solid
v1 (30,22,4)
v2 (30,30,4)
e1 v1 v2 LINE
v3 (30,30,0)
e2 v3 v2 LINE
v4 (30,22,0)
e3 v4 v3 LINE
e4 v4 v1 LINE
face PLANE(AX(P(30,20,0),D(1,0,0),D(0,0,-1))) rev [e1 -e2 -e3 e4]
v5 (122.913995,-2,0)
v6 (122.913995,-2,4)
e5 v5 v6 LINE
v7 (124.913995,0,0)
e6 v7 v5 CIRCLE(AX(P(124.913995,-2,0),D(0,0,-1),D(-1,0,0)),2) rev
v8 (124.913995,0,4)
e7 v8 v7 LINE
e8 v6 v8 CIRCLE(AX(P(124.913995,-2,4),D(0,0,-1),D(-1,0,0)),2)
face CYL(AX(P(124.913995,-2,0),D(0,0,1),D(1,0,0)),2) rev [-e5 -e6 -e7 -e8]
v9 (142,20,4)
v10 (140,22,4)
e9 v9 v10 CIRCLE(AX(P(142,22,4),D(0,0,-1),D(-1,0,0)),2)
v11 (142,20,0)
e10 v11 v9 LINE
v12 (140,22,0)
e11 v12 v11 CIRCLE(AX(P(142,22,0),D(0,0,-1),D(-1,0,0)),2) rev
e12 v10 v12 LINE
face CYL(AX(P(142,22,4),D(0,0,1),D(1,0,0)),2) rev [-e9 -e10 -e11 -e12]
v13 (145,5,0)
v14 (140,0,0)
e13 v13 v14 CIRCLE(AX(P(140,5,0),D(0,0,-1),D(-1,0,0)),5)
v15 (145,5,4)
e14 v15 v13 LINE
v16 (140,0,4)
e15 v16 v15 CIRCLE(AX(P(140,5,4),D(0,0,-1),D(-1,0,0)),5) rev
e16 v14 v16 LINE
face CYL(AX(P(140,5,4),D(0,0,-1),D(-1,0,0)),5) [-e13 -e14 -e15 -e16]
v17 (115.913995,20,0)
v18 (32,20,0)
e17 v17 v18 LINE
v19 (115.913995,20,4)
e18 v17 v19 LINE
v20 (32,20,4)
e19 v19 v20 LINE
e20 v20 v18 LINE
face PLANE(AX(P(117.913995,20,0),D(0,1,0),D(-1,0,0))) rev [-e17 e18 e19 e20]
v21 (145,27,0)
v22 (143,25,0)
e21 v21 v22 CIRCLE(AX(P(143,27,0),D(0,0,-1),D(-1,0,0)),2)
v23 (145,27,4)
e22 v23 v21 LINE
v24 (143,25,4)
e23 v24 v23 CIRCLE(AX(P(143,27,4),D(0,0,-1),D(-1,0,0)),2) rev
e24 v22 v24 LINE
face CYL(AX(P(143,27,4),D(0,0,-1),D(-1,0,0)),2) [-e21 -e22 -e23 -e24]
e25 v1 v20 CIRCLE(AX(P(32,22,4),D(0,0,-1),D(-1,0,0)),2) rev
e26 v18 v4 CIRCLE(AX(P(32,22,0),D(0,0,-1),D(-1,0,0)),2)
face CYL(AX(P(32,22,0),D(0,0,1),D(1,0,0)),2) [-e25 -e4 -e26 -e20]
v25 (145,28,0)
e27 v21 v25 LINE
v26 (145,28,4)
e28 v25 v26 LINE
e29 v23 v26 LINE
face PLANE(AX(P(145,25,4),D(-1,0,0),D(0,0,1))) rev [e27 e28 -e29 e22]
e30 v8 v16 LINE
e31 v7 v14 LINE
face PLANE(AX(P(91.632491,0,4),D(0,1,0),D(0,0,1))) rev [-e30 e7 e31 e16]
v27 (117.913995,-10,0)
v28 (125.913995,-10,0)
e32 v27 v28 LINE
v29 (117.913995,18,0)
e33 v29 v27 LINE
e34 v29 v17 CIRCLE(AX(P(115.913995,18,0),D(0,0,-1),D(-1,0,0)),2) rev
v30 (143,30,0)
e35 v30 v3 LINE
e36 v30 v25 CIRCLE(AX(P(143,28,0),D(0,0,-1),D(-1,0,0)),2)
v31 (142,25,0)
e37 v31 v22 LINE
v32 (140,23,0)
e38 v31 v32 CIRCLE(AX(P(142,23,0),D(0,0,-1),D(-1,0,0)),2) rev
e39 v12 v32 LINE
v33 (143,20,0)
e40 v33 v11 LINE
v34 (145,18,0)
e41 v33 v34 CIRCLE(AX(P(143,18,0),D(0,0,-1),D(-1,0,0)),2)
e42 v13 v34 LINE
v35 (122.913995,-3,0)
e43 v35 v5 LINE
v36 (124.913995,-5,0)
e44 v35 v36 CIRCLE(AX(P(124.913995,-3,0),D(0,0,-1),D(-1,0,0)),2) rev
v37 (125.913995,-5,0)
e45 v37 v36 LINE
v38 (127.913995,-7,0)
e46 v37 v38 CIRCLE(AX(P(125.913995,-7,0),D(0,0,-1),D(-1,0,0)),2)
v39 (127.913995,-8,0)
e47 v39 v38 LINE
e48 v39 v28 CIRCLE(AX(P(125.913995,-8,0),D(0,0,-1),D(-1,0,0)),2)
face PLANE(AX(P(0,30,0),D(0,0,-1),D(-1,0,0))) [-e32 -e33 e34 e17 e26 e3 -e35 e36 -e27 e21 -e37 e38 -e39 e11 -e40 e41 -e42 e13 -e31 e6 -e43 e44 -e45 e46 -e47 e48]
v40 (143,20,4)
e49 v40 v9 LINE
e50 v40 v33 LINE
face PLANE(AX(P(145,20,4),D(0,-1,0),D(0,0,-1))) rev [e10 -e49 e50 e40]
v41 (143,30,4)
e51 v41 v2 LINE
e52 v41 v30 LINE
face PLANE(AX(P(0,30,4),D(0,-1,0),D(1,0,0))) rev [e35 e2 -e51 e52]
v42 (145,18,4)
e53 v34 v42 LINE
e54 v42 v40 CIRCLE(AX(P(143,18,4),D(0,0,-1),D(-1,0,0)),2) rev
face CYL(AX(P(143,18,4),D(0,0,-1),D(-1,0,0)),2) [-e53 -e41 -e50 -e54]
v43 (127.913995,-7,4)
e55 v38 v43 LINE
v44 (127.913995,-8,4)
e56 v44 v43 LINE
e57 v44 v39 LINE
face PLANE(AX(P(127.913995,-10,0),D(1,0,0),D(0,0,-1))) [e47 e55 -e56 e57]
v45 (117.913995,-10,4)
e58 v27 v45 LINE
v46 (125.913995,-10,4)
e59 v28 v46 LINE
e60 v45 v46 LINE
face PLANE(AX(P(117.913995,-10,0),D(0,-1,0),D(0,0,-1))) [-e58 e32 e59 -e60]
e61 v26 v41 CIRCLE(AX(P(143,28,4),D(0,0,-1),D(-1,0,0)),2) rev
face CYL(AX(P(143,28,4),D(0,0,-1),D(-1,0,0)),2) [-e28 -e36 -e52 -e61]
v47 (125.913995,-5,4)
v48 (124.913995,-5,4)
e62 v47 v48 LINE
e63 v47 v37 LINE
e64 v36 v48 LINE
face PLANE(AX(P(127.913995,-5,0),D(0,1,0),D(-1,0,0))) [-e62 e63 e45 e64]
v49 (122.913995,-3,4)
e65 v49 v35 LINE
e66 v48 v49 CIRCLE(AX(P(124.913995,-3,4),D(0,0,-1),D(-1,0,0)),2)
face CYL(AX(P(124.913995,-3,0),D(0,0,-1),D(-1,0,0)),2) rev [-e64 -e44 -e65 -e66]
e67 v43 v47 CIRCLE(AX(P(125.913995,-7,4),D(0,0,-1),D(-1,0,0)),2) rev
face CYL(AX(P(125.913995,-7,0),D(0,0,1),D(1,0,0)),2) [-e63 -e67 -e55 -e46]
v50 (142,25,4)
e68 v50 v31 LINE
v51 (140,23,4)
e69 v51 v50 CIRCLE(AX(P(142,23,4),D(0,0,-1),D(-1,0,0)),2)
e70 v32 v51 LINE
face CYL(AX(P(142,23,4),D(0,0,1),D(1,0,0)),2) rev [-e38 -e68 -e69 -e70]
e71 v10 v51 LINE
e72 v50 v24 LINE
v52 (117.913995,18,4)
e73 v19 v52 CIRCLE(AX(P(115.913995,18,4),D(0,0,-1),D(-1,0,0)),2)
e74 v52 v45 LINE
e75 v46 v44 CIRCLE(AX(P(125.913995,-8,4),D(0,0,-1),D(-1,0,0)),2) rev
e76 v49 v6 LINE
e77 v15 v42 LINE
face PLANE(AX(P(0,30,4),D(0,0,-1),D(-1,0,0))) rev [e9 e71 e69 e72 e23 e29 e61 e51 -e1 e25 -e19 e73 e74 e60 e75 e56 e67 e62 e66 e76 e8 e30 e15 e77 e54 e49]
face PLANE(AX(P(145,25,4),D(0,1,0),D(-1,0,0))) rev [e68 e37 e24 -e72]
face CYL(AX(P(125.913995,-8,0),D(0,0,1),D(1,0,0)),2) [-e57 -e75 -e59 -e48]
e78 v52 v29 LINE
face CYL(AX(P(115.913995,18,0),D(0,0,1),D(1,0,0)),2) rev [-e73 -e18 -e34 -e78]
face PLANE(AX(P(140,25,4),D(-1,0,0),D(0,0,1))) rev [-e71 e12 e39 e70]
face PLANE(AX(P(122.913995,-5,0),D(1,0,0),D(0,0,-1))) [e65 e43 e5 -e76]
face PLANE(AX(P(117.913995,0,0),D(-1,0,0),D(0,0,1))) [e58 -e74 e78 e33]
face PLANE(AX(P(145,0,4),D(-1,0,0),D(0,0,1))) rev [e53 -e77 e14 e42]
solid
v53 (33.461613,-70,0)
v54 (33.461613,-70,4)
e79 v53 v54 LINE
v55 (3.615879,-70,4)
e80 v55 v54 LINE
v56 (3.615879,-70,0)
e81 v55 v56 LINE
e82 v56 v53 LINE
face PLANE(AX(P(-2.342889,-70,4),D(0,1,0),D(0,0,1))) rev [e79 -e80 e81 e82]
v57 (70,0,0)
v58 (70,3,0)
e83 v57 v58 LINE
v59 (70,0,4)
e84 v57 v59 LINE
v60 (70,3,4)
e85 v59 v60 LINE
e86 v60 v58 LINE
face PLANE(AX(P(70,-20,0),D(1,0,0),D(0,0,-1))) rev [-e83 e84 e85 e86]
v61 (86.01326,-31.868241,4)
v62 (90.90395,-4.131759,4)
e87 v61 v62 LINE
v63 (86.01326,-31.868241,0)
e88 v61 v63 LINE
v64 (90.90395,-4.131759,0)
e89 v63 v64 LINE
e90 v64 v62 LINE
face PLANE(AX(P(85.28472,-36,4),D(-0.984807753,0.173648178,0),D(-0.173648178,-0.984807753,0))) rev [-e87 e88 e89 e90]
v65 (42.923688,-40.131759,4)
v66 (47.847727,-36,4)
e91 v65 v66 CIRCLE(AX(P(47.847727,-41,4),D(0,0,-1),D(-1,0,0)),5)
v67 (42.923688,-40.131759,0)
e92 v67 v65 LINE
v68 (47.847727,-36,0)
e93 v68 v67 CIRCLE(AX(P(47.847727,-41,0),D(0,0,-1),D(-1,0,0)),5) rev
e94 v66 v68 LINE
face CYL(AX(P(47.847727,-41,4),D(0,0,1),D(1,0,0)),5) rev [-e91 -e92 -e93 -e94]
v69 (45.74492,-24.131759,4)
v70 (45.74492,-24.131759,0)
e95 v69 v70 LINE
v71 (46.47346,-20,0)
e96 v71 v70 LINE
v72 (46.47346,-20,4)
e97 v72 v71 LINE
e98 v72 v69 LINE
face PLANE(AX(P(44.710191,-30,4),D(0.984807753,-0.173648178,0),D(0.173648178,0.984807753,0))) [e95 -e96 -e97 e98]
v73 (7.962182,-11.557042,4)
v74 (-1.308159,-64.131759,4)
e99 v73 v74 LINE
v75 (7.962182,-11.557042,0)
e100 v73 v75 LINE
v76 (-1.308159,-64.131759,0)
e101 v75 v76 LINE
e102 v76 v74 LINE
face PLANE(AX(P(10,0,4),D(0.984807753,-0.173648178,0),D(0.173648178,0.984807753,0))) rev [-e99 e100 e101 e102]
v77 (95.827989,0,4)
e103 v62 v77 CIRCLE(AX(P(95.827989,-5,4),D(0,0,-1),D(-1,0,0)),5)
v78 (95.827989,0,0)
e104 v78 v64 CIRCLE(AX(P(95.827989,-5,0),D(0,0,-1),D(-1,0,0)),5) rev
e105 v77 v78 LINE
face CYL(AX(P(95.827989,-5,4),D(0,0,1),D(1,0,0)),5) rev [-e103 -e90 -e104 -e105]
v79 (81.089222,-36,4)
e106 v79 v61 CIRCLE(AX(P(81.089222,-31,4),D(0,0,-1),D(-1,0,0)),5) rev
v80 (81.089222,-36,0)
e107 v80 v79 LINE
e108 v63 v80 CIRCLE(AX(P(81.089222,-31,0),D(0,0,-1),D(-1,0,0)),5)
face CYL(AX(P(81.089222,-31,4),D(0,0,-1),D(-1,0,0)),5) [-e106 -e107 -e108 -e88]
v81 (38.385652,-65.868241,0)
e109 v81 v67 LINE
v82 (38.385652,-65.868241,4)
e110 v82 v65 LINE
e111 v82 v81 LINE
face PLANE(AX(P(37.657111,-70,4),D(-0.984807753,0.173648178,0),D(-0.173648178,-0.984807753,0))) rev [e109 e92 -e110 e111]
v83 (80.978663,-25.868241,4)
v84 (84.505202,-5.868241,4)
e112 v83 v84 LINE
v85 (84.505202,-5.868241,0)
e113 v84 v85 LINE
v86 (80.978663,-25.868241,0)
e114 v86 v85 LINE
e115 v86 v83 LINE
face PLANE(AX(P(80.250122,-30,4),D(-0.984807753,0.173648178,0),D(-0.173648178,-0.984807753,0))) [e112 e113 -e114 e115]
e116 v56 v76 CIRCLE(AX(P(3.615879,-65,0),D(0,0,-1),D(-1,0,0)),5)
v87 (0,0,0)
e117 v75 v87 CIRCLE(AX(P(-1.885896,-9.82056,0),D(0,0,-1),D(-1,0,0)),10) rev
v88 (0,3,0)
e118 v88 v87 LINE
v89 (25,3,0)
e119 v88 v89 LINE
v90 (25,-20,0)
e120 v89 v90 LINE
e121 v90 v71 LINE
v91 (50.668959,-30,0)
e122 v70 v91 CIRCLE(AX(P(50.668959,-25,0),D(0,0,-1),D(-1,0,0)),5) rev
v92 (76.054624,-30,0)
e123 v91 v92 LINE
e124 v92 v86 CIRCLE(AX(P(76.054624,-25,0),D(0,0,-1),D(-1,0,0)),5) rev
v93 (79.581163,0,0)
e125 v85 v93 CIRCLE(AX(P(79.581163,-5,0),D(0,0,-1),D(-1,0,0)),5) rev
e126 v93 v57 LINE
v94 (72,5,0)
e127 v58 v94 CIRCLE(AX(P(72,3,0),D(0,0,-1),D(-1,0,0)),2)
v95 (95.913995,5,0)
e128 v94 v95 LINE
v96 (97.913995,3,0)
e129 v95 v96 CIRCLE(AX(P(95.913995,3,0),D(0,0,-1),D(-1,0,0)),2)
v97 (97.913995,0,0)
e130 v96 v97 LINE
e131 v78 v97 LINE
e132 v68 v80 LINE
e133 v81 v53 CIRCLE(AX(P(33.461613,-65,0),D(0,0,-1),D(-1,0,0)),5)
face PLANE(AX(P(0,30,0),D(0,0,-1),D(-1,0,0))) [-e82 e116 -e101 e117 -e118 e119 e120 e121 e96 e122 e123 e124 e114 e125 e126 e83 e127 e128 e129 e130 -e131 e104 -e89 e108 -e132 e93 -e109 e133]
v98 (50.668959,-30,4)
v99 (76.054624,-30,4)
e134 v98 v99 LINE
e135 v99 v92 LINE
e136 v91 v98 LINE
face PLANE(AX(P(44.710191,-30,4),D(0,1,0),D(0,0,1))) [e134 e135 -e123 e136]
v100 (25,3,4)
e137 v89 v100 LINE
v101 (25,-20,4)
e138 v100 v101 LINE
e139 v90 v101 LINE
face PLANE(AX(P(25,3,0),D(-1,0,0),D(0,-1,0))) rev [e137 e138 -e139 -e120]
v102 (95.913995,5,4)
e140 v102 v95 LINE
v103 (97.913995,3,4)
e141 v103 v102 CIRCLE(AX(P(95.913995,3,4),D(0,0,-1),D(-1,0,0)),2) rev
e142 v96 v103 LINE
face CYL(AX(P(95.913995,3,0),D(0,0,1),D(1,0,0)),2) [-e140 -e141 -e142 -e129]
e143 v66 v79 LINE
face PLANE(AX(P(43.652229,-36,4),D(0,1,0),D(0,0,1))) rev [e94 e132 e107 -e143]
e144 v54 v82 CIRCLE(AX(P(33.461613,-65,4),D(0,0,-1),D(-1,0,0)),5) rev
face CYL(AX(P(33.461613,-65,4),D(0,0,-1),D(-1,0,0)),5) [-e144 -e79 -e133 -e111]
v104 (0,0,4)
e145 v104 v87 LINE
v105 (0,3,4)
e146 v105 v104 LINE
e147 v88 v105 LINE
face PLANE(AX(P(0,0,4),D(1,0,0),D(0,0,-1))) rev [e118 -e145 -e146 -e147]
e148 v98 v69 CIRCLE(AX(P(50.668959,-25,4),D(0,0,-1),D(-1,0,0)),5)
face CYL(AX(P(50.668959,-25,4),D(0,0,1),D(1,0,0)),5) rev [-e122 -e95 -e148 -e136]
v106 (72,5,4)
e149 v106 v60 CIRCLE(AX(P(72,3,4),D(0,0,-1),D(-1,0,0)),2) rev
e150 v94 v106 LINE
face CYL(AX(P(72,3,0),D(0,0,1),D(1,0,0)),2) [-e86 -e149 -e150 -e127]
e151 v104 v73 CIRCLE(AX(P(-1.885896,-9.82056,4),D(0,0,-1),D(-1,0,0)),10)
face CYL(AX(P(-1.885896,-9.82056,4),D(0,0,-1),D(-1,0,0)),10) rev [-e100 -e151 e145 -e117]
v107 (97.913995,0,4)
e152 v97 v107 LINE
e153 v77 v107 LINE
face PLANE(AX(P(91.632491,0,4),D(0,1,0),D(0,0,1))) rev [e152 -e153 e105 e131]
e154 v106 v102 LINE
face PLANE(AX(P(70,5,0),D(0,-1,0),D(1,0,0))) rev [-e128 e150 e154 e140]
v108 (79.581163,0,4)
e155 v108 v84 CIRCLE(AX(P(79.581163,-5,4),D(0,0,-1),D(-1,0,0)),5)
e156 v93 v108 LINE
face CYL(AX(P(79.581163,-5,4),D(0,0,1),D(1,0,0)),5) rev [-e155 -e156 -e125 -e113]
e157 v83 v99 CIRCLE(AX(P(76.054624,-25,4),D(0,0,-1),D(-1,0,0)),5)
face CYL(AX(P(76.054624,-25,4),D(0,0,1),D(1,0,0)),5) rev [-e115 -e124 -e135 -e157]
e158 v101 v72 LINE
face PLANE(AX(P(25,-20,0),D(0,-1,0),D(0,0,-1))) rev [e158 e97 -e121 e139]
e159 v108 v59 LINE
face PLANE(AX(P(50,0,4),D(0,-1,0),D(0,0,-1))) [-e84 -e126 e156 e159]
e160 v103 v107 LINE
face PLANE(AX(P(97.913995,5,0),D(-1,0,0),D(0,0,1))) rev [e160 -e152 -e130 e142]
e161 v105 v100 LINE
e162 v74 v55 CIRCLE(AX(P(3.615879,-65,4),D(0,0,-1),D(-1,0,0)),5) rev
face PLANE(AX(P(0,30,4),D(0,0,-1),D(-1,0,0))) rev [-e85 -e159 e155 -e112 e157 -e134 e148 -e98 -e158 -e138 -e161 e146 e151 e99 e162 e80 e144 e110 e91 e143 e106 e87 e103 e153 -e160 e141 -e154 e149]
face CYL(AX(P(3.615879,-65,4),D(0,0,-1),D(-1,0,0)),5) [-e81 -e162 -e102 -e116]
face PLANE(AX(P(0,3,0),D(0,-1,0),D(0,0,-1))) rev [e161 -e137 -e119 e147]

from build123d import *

# Parameters (mm, degrees)
BOSS_EXTRUDE1_DEPTH = 4
FILLET1_R           = 10
FILLET2_R           = 5
CUT_EXTRUDE1_DEPTH  = 4
LPATTERN1_COUNT     = 6
LPATTERN1_PITCH     = 4
FILLET3_R           = 2
FILLET4_R           = 2
BOSS_EXTRUDE2_DEPTH = 4
FILLET5_R           = 2
CUT_EXTRUDE2_DEPTH  = 4
FILLET6_R           = 2
FILLET7_R           = 2
FILLET8_R           = 2
FILLET9_R           = 2


with BuildPart() as part:
    # Sketch1 → Boss-Extrude1 (new body)
    with BuildSketch(Plane.XY):
        Polygon((10, 0), (-2.34288865, -70), (37.65711135, -70), (43.652228694, -36), (85.284719782, -36), (91.632491087, 0), (145, 0), (145, 20), (140, 20), (140, 25), (145, 25), (145, 30), (0, 30), (0, 0), align=None)
        Polygon((44.710190579, -30), (80.250121995, -30), (85.539931416, 0), (50, 0), align=None, mode=Mode.SUBTRACT)
    extrude(amount=BOSS_EXTRUDE1_DEPTH)

    # Fillet1
    # the kernel refuses this fillet: 10 mm, written as the material it adds along each edge
    with BuildSketch(Plane(origin=(10, 0, 0), x_dir=(-0.17364817766693433, -0.9848077530122074, 0), z_dir=(0, 0, 1))) as fillet1_piece_1:
        with BuildLine():
            CenterArc((11.735327688, -10), FILLET1_R, 90, 89.129514879)
            Line((1.736481777, -9.84807753), (1.536504858, -9.845039081))
            ThreePointArc((1.536504858, -9.845039081), (0.671279338, -4.958768401), (-0.196961551, -0.034729636))
            Line((-0.196961551, -0.034729636), (0, 0.2))
            Line((0, 0.2), (11.735327688, 0.2))
            Line((11.735327688, 0.2), (11.735327688, 0))
        make_face()
    extrude(amount=4)

    # Fillet2
    fillet2_edges = [part.edges().sort_by_distance(p)[0] for p in [
        (145, 0, 2),
        (91.632491087, 0, 2),
        (85.284719782, -36, 2),
        (43.652228694, -36, 2),
        (37.65711135, -70, 2),
        (-2.34288865, -70, 2),
        (85.539931416, 0, 2),
        (50, 0, 2),
        (44.710190579, -30, 2),
        (80.250121995, -30, 2),
    ]]
    fillet(fillet2_edges, radius=FILLET2_R)

    # Sketch2 → Cut-Extrude1 (cut)
    with BuildSketch(Plane.XY.offset(4)):
        Polygon((0, 27), (4, 27), (0, 23), align=None)
    cut_extrude1 = extrude(amount=-CUT_EXTRUDE1_DEPTH, mode=Mode.SUBTRACT)

    # LPattern1: Cut-Extrude1 ×6
    with Locations(*[(0, -i * LPATTERN1_PITCH, 0) for i in range(1, LPATTERN1_COUNT)]):
        add(cut_extrude1, mode=Mode.SUBTRACT)

    # Fillet3
    fillet3_edges = [part.edges().sort_by_distance(p)[0] for p in [
        (145, 25, 2),
        (140, 25, 2),
        (140, 20, 2),
        (145, 20, 2),
    ]]
    fillet(fillet3_edges, radius=FILLET3_R)

    # Fillet4
    fillet4_edges = [part.edges().sort_by_distance(p)[0] for p in [
        (145, 30, 2),
    ]]
    fillet(fillet4_edges, radius=FILLET4_R)

    # Sketch3 → Boss-Extrude2 (add)
    with BuildSketch(Plane.XY.offset(4)):
        Polygon((117.913994622, 0), (117.913994622, -10), (127.913994622, -10), (127.913994622, -5), (122.913994622, -5), (122.913994622, 0), align=None)
    extrude(amount=-BOSS_EXTRUDE2_DEPTH)

    # Fillet5
    fillet5_edges = [part.edges().sort_by_distance(p)[0] for p in [
        (122.913994622, 0, 2),
        (122.913994622, -5, 2),
        (127.913994622, -5, 2),
        (127.913994622, -10, 2),
    ]]
    fillet(fillet5_edges, radius=FILLET5_R)

    # Sketch4 → Cut-Extrude2 (cut)
    with BuildSketch(Plane.XY.offset(4)):
        Polygon((117.913994622, 0), (117.913994622, 20), (30, 20), (30, 30), (0, 30), (0, 3), (25, 3), (25, -20), (70, -20), (70, 5), (97.913994622, 5), (97.913994622, 0), align=None)
    extrude(amount=-CUT_EXTRUDE2_DEPTH, mode=Mode.SUBTRACT)


with BuildPart() as cut_extrude2_piece_1:
    # of the separate pieces the step leaves, piece 1, a body of its own (cut_extrude2_pieces)
    add(part.part.solids().sort_by_distance((97.913994622, 5, 0))[0])

    # Fillet7
    fillet7_edges = [cut_extrude2_piece_1.edges().sort_by_distance(p)[0] for p in [
        (97.913994622, 5, 2),
    ]]
    fillet(fillet7_edges, radius=FILLET7_R)

    # Fillet9
    fillet9_edges = [cut_extrude2_piece_1.edges().sort_by_distance(p)[0] for p in [
        (70, 5, 2),
    ]]
    fillet(fillet9_edges, radius=FILLET9_R)


with BuildPart() as cut_extrude2_piece_2:
    # of the separate pieces the step leaves, piece 2, a body of its own (cut_extrude2_pieces)
    add(part.part.solids().sort_by_distance((124.913994622, 0, 0))[0])

    # Fillet6
    fillet6_edges = [cut_extrude2_piece_2.edges().sort_by_distance(p)[0] for p in [
        (117.913994622, 20, 2),
    ]]
    fillet(fillet6_edges, radius=FILLET6_R)

    # Fillet8
    fillet8_edges = [cut_extrude2_piece_2.edges().sort_by_distance(p)[0] for p in [
        (30, 20, 2),
    ]]
    fillet(fillet8_edges, radius=FILLET8_R)


solid = Compound([cut_extrude2_piece_1.part, cut_extrude2_piece_2.part])
